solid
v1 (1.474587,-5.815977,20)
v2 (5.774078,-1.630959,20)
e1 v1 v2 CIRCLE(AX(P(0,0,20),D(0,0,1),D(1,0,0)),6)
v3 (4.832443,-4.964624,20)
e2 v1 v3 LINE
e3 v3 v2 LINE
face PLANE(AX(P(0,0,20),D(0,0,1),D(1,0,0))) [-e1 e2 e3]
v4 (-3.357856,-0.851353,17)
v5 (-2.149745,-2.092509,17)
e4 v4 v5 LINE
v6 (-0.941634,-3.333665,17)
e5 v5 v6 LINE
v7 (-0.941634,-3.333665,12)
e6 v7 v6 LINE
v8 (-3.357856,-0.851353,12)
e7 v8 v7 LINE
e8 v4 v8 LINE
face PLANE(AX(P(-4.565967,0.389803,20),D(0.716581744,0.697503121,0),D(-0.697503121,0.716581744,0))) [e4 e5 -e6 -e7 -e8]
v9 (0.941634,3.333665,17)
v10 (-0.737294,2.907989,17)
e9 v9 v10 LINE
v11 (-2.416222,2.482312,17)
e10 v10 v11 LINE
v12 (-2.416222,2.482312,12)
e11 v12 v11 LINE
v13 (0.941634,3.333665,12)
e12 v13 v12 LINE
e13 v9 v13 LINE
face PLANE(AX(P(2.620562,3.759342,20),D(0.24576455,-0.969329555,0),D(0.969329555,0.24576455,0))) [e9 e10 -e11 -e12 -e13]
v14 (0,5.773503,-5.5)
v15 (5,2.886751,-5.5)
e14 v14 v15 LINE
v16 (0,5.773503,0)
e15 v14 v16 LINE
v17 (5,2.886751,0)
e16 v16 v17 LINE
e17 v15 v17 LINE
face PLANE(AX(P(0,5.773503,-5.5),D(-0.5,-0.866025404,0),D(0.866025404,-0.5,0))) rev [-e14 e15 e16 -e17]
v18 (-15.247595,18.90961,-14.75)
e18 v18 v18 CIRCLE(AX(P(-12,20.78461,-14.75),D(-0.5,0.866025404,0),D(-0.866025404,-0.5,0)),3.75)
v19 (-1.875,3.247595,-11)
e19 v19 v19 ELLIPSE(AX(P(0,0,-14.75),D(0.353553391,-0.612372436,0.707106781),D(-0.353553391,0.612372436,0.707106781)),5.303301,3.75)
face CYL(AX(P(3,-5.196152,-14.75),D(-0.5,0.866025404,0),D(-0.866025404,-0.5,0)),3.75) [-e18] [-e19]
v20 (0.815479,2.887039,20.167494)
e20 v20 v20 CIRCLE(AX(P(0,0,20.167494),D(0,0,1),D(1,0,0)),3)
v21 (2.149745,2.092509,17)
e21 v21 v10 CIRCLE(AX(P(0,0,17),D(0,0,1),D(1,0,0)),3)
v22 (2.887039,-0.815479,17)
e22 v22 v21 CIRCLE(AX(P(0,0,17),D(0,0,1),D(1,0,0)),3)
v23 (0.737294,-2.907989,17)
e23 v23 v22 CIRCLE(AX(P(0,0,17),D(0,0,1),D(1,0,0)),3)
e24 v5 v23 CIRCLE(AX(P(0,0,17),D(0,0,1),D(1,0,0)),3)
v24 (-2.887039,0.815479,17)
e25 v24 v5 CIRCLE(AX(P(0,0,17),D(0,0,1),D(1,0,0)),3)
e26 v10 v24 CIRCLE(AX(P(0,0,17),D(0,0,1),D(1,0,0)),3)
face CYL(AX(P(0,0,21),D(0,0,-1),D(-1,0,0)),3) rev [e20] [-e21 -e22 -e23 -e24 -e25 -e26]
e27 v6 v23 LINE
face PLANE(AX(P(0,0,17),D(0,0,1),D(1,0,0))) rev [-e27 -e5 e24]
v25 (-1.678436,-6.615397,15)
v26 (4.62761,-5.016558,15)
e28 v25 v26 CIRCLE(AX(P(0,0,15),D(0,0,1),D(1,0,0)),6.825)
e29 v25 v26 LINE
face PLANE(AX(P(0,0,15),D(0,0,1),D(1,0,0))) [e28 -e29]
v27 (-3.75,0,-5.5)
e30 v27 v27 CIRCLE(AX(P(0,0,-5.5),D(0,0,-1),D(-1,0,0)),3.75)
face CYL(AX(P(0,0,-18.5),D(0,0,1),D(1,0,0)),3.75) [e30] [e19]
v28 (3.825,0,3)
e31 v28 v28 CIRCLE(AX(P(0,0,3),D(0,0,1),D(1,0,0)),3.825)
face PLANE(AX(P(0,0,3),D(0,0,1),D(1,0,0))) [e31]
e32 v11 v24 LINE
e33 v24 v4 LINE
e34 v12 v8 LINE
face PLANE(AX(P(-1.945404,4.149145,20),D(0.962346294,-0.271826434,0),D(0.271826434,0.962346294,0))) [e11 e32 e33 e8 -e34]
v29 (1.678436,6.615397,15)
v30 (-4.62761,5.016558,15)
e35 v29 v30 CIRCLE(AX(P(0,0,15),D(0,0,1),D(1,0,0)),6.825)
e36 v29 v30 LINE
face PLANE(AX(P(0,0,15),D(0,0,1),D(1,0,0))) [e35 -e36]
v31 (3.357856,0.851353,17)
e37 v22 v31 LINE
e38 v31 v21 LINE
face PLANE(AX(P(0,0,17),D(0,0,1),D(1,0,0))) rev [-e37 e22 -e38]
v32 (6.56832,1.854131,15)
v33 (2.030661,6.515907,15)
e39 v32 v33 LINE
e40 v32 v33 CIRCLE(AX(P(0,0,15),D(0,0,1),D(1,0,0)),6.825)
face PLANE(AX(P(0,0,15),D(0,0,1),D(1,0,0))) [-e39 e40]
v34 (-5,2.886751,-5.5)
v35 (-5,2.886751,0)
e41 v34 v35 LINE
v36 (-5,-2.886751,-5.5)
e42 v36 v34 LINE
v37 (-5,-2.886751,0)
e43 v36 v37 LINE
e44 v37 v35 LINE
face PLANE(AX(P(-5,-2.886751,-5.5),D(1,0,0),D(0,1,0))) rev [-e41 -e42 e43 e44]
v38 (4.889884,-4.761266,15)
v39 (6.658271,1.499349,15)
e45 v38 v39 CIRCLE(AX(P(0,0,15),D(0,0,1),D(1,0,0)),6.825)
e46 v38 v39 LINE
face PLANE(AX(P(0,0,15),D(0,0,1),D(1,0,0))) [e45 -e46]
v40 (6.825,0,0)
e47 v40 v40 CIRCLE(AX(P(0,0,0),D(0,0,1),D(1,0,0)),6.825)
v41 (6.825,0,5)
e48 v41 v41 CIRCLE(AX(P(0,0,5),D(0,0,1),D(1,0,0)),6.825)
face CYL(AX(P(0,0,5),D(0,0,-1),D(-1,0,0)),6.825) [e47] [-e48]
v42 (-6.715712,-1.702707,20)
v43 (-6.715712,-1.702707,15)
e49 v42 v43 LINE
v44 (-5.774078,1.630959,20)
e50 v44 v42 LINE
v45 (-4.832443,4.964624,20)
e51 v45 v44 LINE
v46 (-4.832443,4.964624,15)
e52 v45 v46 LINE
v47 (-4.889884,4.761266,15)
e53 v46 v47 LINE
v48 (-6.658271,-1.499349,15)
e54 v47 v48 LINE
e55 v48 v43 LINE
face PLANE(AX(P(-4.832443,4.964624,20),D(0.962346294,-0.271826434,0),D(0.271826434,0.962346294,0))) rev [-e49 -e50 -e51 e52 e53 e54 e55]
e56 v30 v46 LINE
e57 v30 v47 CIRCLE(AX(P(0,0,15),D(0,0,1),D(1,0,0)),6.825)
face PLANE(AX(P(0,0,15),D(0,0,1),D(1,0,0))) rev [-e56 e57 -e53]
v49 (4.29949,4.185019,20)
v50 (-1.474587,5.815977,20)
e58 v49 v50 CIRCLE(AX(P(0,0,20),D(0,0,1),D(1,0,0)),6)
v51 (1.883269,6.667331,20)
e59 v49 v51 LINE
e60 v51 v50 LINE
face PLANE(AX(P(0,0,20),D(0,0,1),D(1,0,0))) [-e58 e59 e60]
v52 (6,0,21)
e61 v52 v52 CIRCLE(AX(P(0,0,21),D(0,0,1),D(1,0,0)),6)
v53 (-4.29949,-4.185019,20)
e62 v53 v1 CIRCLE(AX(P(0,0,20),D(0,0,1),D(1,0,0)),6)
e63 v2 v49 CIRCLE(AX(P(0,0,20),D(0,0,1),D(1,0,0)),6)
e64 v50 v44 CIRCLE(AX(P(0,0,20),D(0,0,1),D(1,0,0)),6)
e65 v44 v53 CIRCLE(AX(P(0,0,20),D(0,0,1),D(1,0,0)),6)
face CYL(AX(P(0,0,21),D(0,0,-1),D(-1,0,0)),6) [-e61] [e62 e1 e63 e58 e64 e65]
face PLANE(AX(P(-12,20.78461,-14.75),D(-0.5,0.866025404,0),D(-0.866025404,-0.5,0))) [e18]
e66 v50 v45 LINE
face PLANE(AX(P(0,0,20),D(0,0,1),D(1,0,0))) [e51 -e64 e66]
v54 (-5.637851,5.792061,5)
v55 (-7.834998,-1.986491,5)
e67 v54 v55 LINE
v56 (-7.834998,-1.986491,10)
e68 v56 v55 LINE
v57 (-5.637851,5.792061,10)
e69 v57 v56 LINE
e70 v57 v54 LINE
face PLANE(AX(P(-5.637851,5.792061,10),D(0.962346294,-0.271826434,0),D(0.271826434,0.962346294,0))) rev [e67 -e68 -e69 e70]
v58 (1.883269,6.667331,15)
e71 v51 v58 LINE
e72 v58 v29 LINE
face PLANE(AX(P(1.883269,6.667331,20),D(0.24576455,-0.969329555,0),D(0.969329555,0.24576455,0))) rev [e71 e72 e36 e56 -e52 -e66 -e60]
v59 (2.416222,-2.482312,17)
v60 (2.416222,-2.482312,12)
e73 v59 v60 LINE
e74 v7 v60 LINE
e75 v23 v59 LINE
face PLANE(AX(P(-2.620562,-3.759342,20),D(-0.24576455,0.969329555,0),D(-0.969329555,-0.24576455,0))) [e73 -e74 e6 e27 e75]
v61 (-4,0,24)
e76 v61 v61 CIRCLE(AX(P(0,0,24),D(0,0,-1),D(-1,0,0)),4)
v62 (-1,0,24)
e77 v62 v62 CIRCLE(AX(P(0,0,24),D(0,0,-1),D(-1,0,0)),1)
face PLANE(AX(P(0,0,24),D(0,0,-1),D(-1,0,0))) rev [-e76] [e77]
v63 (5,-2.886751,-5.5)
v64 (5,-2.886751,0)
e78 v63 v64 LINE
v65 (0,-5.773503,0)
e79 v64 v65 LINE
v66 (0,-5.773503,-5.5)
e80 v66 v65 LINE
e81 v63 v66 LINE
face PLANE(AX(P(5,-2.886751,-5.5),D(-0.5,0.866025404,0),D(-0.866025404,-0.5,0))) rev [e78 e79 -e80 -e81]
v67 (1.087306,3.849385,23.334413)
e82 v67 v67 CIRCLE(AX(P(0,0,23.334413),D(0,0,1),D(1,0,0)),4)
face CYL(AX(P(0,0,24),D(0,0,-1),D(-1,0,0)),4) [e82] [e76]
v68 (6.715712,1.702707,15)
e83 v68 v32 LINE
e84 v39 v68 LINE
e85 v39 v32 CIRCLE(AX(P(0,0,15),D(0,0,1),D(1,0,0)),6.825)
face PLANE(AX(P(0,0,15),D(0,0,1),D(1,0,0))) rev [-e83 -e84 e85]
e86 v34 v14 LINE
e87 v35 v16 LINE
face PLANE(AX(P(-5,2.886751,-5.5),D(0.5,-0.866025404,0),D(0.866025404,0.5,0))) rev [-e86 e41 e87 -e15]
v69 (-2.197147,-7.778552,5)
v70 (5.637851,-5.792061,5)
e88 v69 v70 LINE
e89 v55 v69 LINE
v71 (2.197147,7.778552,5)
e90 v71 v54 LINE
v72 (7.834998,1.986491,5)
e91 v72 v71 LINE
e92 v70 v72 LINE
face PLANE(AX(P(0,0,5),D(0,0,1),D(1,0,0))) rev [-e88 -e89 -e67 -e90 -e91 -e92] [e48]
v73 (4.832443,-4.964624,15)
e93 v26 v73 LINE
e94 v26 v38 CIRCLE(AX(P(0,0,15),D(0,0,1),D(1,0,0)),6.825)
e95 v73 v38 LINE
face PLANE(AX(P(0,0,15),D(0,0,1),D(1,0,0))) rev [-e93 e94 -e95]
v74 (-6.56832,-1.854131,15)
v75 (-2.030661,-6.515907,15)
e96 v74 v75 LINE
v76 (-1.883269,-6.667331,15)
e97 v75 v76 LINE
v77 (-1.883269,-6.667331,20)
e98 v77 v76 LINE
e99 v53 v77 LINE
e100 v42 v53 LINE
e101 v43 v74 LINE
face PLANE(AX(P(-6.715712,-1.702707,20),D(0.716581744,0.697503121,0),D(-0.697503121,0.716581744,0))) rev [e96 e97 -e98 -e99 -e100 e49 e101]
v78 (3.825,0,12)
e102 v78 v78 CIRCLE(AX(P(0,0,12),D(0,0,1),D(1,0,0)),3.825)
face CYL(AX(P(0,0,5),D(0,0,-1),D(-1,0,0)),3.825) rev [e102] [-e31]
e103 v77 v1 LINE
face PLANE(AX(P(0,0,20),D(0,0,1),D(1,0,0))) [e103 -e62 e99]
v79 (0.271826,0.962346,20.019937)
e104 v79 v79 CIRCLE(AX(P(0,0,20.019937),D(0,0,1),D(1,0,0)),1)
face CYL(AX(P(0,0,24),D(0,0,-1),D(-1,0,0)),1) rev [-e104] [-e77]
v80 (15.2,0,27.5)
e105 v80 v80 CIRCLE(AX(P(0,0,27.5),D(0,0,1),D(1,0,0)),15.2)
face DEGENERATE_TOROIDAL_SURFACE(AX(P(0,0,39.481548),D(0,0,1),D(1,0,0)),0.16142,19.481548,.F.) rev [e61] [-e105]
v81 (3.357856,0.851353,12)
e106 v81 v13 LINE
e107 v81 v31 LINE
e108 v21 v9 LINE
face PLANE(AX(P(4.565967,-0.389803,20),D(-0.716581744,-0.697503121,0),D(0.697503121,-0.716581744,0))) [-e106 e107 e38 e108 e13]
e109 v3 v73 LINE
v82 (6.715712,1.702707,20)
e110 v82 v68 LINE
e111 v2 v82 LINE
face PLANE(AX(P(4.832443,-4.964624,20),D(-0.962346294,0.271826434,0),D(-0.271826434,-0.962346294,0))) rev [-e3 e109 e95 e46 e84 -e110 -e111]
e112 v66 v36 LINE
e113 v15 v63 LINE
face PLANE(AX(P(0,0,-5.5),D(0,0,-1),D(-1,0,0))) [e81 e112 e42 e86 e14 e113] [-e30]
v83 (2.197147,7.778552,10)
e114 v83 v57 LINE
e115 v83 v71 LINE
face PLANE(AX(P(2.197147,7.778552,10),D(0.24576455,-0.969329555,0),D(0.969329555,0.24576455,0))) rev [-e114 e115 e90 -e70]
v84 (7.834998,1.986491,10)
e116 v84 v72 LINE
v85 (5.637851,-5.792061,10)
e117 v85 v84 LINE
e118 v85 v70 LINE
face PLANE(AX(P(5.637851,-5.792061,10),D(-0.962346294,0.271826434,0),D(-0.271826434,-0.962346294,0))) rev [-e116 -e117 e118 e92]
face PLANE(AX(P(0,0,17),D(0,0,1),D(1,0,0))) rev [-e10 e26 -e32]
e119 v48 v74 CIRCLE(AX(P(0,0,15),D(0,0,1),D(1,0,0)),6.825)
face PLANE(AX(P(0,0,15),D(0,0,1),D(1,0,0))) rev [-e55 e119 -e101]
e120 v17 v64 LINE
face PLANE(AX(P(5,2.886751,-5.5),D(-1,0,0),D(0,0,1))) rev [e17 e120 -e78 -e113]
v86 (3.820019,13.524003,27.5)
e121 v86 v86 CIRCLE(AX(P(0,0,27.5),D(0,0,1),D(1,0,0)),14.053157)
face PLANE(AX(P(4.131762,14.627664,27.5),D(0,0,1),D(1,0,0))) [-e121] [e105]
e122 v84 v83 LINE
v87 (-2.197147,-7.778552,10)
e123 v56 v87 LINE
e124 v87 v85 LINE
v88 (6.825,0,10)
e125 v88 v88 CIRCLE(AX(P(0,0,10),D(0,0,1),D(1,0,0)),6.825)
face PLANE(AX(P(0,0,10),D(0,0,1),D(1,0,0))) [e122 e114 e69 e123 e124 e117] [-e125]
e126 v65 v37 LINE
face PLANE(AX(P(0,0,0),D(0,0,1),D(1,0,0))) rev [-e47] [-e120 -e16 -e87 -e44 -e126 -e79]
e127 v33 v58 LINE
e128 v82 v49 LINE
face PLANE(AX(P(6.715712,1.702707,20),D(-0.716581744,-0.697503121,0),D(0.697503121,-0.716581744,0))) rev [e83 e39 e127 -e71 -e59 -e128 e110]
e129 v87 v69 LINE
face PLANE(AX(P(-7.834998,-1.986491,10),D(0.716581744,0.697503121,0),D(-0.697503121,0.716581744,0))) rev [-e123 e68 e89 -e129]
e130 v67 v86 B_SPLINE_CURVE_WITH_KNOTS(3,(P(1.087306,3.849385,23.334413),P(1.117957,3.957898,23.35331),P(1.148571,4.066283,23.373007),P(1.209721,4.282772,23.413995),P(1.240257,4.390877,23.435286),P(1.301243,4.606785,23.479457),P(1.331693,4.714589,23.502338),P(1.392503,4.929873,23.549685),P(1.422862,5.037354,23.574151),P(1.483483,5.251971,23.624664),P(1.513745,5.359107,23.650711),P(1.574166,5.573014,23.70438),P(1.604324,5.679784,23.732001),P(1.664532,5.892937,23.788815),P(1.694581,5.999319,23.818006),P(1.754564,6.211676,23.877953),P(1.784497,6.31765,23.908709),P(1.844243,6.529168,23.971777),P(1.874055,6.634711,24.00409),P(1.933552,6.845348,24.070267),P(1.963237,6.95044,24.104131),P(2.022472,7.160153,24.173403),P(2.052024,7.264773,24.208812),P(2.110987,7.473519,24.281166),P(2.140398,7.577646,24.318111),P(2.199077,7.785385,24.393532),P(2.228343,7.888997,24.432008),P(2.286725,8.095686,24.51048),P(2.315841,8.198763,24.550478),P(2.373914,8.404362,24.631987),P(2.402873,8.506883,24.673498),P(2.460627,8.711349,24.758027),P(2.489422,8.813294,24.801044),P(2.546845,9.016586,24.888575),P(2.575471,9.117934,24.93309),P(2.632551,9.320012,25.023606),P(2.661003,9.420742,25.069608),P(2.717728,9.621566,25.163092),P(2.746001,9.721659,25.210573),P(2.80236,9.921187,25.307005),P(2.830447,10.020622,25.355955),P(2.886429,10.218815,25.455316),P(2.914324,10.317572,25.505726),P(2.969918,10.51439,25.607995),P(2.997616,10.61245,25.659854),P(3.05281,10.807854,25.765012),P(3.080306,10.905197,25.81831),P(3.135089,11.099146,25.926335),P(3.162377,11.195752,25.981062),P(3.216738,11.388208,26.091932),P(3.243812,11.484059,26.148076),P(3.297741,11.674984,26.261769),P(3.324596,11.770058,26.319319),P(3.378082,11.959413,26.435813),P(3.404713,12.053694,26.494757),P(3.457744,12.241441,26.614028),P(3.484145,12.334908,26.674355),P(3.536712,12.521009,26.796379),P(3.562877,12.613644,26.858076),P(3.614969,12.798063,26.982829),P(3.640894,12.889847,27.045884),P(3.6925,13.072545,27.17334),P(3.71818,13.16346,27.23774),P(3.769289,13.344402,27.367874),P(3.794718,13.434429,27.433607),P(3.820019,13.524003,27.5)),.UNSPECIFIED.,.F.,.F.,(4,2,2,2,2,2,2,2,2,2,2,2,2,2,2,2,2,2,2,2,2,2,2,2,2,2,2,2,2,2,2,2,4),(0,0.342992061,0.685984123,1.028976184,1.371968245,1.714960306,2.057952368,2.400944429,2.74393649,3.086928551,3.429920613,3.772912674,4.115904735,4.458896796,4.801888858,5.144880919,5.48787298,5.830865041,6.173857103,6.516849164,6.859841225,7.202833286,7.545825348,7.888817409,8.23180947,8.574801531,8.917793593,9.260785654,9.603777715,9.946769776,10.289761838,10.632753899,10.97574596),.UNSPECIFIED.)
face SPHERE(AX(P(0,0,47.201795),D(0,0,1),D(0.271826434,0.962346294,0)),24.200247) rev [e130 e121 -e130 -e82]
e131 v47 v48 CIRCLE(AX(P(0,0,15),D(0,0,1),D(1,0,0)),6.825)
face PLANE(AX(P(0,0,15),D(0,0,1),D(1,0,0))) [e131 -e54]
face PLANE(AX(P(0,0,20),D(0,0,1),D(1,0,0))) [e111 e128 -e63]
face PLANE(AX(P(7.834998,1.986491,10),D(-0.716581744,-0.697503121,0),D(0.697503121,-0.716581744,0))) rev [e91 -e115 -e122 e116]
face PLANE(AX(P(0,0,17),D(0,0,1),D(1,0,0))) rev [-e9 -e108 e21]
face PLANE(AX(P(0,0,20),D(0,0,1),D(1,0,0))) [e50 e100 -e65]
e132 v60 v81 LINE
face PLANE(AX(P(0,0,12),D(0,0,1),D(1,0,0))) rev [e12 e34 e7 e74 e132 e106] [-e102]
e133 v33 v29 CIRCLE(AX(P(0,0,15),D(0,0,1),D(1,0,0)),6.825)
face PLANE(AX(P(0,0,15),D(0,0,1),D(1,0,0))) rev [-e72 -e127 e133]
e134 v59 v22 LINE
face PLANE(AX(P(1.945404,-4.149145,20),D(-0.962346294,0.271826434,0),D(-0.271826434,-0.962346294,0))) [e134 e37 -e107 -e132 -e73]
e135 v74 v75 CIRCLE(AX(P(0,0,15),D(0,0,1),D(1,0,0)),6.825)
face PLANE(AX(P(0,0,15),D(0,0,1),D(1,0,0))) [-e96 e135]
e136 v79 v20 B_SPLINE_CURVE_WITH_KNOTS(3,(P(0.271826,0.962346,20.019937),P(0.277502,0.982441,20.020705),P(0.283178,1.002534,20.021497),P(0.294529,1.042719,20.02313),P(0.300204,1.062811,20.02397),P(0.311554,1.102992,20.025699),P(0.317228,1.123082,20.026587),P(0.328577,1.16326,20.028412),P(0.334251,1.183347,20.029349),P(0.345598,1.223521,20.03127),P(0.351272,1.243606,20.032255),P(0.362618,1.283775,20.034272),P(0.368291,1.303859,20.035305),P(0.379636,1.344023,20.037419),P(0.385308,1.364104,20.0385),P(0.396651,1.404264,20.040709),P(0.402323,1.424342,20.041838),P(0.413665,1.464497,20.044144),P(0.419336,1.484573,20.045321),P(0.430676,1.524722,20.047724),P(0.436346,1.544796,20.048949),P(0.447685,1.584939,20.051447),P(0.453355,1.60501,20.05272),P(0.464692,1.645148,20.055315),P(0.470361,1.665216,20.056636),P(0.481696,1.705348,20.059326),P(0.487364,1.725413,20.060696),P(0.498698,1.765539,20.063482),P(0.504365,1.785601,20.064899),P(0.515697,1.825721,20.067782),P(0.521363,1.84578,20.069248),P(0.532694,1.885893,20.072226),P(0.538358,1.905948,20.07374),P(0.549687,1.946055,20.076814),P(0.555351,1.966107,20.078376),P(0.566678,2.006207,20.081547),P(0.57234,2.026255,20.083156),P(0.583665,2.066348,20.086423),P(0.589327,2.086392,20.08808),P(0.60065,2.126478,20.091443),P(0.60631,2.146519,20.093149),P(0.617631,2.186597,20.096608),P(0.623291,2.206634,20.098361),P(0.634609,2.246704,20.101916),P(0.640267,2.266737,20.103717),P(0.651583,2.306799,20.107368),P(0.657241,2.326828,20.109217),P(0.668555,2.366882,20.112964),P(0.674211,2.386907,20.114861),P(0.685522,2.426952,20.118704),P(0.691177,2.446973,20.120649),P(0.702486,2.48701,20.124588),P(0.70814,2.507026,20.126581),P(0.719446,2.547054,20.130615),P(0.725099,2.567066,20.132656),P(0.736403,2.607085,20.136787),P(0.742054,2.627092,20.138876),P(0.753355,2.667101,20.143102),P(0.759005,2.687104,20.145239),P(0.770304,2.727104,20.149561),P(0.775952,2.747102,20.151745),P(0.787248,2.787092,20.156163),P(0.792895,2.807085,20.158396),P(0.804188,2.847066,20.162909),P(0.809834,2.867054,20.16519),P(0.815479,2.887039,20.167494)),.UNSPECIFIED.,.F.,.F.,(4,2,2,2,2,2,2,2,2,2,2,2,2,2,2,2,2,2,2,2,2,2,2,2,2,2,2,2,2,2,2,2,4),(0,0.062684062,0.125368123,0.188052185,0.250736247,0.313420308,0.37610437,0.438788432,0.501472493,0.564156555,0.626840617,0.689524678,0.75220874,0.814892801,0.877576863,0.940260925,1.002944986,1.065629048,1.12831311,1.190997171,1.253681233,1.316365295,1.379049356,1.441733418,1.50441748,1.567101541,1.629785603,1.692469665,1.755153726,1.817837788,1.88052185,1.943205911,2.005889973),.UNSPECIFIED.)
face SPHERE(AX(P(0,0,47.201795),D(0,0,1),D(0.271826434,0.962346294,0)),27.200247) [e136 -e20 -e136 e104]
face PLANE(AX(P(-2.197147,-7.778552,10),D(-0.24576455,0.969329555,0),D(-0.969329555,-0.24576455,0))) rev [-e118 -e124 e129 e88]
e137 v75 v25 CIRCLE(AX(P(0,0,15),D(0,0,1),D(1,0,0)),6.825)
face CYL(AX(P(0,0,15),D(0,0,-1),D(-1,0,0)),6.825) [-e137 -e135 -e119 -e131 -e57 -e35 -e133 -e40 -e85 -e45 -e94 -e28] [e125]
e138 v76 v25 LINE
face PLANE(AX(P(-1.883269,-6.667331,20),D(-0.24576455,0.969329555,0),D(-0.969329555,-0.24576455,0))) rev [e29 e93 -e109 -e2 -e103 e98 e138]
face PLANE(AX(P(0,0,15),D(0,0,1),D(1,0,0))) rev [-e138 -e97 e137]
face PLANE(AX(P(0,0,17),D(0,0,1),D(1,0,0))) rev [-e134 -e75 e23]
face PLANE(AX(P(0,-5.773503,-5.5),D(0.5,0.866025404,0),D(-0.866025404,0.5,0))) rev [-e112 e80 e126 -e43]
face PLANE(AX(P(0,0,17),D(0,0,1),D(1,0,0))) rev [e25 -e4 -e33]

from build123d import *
from build123d.topology import SkipClean

# Parameters (mm, degrees)
ESQUISSE1_R             = 6.825
BOSS_EXTRU_1_DEPTH      = 5
BOSS_EXTRU_2_DEPTH      = 5
ESQUISSE3_R             = 6.825
BOSS_EXTRU_3_DEPTH      = 5
BOSS_EXTRU_4_DEPTH      = 5
ESQUISSE5_R             = 6
BOSS_EXTRU_5_DEPTH      = 1
ESQUISSE8_R             = 4
BOSS_EXTRU_6_DEPTH      = 4
COQUE1_START            = 3
COQUE1_OUTLINE_R        = 3
COQUE1_DEPTH            = 17.019936639
COQUE1_2_OUTLINE_R      = 3.825
COQUE1_2_OUTLINE_R_2    = 3
COQUE1_2_DEPTH          = 9
COQUE1_START_2          = 12
COQUE1_3_DEPTH          = 5
COQUE1_START_3          = 17
COQUE1_4_OUTLINE_R      = 1
COQUE1_4_DEPTH          = 7
BOSS_EXTRU_7_DEPTH      = 5.5
ESQUISSE11_R            = 3.75
BOSS_EXTRU_8_DEPTH      = 13
BOSS_EXTRU_9_DEPTH      = 19
BOSS_EXTRU_9_DEPTH_BACK = 11
ESQUISSE15_R            = 3.75
ENL_V_MAT_EXTRU_1_DEPTH = 36
ENL_V_MAT_EXTRU_2_DEPTH = 24


with BuildPart() as part:
    # Esquisse1 → Boss.-Extru.1 (new body)
    with BuildSketch(Plane.XY):
        Circle(ESQUISSE1_R)
    extrude(amount=BOSS_EXTRU_1_DEPTH)

    # Esquisse2 → Boss.-Extru.2 (add)
    with BuildSketch(Plane.XY.offset(5)):
        Polygon((2.197146908, 7.778552487), (-5.637850605, 5.792061282), (-7.834997513, -1.986491205), (-2.197146908, -7.778552487), (5.637850605, -5.792061282), (7.834997513, 1.986491205), align=None)
    extrude(amount=BOSS_EXTRU_2_DEPTH)

    # Esquisse3 → Boss.-Extru.3 (add)
    with BuildSketch(Plane.XY.offset(10)):
        Circle(ESQUISSE3_R)
    extrude(amount=BOSS_EXTRU_3_DEPTH)

    # Esquisse4 → Boss.-Extru.4 (add)
    with BuildSketch(Plane.XY.offset(15)):
        Polygon((1.883268778, 6.667330703), (-4.832443375, 4.964623956), (-6.715712154, -1.702706748), (-1.883268778, -6.667330703), (4.832443375, -4.964623956), (6.715712154, 1.702706748), align=None)
    extrude(amount=BOSS_EXTRU_4_DEPTH)

    # Esquisse5 → Boss.-Extru.5 (add)
    with BuildSketch(Plane.XY.offset(20)):
        with Locations(Location((0, 0, 0), (0, 0, 164.227020734))):
            Circle(ESQUISSE5_R)
    extrude(amount=BOSS_EXTRU_5_DEPTH)

    # Esquisse6 → Révolution1 (revolve)
    with BuildSketch(Plane(origin=(0, 0, 0), x_dir=(0, 0, 1), z_dir=(-0.9623462940986051, 0.2718264340248778, 0))):
        with BuildLine():
            Line((27.5, 15.2), (27.5, 14.053156671))
            ThreePointArc((27.5, 14.053156671), (24.153582084, 7.377792349), (23.001548337, 0))
            Line((23.001548337, 0), (20.000668758, 0))
            ThreePointArc((20.000668758, 0), (22.010684231, 8.458303467), (27.5, 15.2))
        make_face()
    revolve(axis=Axis((0, 0, 27.429189789), (0, 0, -1)))

    # Esquisse8 → Boss.-Extru.6 (add)
    with BuildSketch(Plane(origin=(0, 0, 20), x_dir=(-1, 0, 0), z_dir=(0, 0, -1))):
        Circle(ESQUISSE8_R)
    extrude(amount=-BOSS_EXTRU_6_DEPTH)

    # Coque1: read off the stored shape, not the designer's step
    # Coque1 outline → Coque1 (cut)
    with BuildSketch(Plane.XY.offset(COQUE1_START)):
        Circle(COQUE1_OUTLINE_R)
    extrude(amount=COQUE1_DEPTH, mode=Mode.SUBTRACT)

    # Coque1 2 outline → Coque1 2 (cut)
    with BuildSketch(Plane.XY.offset(COQUE1_START)):
        Circle(COQUE1_2_OUTLINE_R)
        Circle(COQUE1_2_OUTLINE_R_2, mode=Mode.SUBTRACT)
    extrude(amount=COQUE1_2_DEPTH, mode=Mode.SUBTRACT)

    # Coque1 3 outline → Coque1 3 (cut)
    with BuildSketch(Plane.XY.offset(COQUE1_START_2)):
        with BuildLine():
            Line((-2.887038883, 0.815479301), (-3.357856077, -0.851353374))
            Line((-3.357856077, -0.851353374), (-2.149745259, -2.092509336))
            ThreePointArc((-2.149745259, -2.092509336), (-2.907988669, -0.737293632), (-2.887038883, 0.815479301))
        make_face()
        with BuildLine():
            Line((-2.416221688, 2.482311978), (-2.887038883, 0.815479301))
            ThreePointArc((-2.887038883, 0.815479301), (-2.092509359, 2.149745237), (-0.737293637, 2.907988668))
            Line((-0.737293637, 2.907988668), (-2.416221688, 2.482311978))
        make_face()
        with BuildLine():
            ThreePointArc((0.737293647, -2.907988665), (-0.815479321, -2.887038877), (-2.149745259, -2.092509336))
            Line((-2.149745259, -2.092509336), (-0.941634389, -3.333665352))
            Line((-0.941634389, -3.333665352), (0.737293647, -2.907988665))
        make_face()
        with BuildLine():
            Line((0.941634389, 3.333665352), (-0.737293637, 2.907988668))
            ThreePointArc((-0.737293637, 2.907988668), (0.815479327, 2.887038875), (2.149745261, 2.092509334))
            Line((2.149745261, 2.092509334), (0.941634389, 3.333665352))
        make_face()
        with BuildLine():
            ThreePointArc((2.887038882, -0.815479302), (2.092509362, -2.149745234), (0.737293647, -2.907988665))
            Line((0.737293647, -2.907988665), (2.416221688, -2.482311978))
            Line((2.416221688, -2.482311978), (2.887038882, -0.815479302))
        make_face()
        with BuildLine():
            Line((3.357856077, 0.851353374), (2.149745261, 2.092509334))
            ThreePointArc((2.149745261, 2.092509334), (2.90798867, 0.73729363), (2.887038882, -0.815479302))
            Line((2.887038882, -0.815479302), (3.357856077, 0.851353374))
        make_face()
    extrude(amount=COQUE1_3_DEPTH, mode=Mode.SUBTRACT)

    # Coque1 4 outline → Coque1 4 (cut)
    with BuildSketch(Plane.XY.offset(COQUE1_START_3)):
        Circle(COQUE1_4_OUTLINE_R)
    extrude(amount=COQUE1_4_DEPTH, mode=Mode.SUBTRACT)

    # Coque1 5 outline → Coque1 5 (revolve, cut)
    with BuildSketch(Plane.XZ):
        with BuildLine():
            ThreePointArc((3.000000027, 20.167494226), (2.001360363, 20.075277066), (0.999999973, 20.019936738))
            Line((0.999999973, 20.019936738), (3, 20.019936639))
            Line((3, 20.019936639), (3.000000027, 20.167494226))
        make_face()
    revolve(axis=Axis((0, 0, 0), (0, 0, 1)), mode=Mode.SUBTRACT)

    # Esquisse10 → Boss.-Extru.7 (add)
    with BuildSketch(Plane(origin=(0, 0, 0), x_dir=(-1, 0, 0), z_dir=(0, 0, -1))):
        Polygon((5, -2.886751346), (5, 2.886751346), (0, 5.773502692), (-5, 2.886751346), (-5, -2.886751346), (0, -5.773502692), align=None)
    extrude(amount=BOSS_EXTRU_7_DEPTH)

    # Esquisse11 → Boss.-Extru.8 (add)
    with BuildSketch(Plane(origin=(0, 0, -5.5), x_dir=(-1, 0, 0), z_dir=(0, 0, -1))):
        with Locations(Location((0, 0, 0), (0, 0, 180))):
            Circle(ESQUISSE11_R)
    extrude(amount=BOSS_EXTRU_8_DEPTH)

    # Esquisse15 → Boss.-Extru.9 (add, two sides: drawn at the far end of the back side and taken through both)
    with BuildSketch(Plane(origin=(-2.5, 4.330127019, 0), x_dir=(0.8660254037844387, 0.4999999999999999, 0), z_dir=(-0.49999999999999994, 0.8660254037844388, 0)).offset(-BOSS_EXTRU_9_DEPTH_BACK)):
        with Locations(Location((0, 14.75, 0), (0, 0, 180))):
            Circle(ESQUISSE15_R)
    extrude(amount=BOSS_EXTRU_9_DEPTH + BOSS_EXTRU_9_DEPTH_BACK)

    # Esquisse17 → Enlèv. mat.-Extru.1 (cut)
    with BuildSketch(Plane(origin=(-12, 20.784609691, 0), x_dir=(0.8660254037844386, 0.5, 0), z_dir=(-0.5000000000000001, 0.8660254037844387, 0))):
        with BuildLine():
            Line((3.75, 14.75), (7.089373521, 14.75))
            Line((7.089373521, 14.75), (7.089373521, 20.468856948))
            Line((7.089373521, 20.468856948), (-7.00273048, 20.468856948))
            Line((-7.00273048, 20.468856948), (-7.00273048, 14.75))
            Line((-7.00273048, 14.75), (-3.75, 14.75))
            ThreePointArc((-3.75, 14.75), (0, 18.5), (3.75, 14.75))
        make_face()
    extrude(amount=-ENL_V_MAT_EXTRU_1_DEPTH, mode=Mode.SUBTRACT)

    # Esquisse18 → Enlèv. mat.-Extru.2 (cut)
    with SkipClean():  # the faces are left unmerged after this step: merging them gives an invalid solid
        with BuildSketch(Plane(origin=(0, 0, -5.5), x_dir=(-1, 0, 0), z_dir=(0, 0, -1))):
            with BuildLine():
                Line((14.892554705, -8.598220468), (3.247595264, -1.875))
                ThreePointArc((3.247595264, -1.875), (-1.875, -3.247595264), (-3.247595264, 1.875))
                Line((-3.247595264, 1.875), (-12.633967987, 7.294224818))
                Line((-12.633967987, 7.294224818), (-3.446061764, -21.412882035))
                Line((-3.446061764, -21.412882035), (14.892554705, -8.598220468))
            make_face()
        extrude(amount=ENL_V_MAT_EXTRU_2_DEPTH, mode=Mode.SUBTRACT)


solid = part.part
